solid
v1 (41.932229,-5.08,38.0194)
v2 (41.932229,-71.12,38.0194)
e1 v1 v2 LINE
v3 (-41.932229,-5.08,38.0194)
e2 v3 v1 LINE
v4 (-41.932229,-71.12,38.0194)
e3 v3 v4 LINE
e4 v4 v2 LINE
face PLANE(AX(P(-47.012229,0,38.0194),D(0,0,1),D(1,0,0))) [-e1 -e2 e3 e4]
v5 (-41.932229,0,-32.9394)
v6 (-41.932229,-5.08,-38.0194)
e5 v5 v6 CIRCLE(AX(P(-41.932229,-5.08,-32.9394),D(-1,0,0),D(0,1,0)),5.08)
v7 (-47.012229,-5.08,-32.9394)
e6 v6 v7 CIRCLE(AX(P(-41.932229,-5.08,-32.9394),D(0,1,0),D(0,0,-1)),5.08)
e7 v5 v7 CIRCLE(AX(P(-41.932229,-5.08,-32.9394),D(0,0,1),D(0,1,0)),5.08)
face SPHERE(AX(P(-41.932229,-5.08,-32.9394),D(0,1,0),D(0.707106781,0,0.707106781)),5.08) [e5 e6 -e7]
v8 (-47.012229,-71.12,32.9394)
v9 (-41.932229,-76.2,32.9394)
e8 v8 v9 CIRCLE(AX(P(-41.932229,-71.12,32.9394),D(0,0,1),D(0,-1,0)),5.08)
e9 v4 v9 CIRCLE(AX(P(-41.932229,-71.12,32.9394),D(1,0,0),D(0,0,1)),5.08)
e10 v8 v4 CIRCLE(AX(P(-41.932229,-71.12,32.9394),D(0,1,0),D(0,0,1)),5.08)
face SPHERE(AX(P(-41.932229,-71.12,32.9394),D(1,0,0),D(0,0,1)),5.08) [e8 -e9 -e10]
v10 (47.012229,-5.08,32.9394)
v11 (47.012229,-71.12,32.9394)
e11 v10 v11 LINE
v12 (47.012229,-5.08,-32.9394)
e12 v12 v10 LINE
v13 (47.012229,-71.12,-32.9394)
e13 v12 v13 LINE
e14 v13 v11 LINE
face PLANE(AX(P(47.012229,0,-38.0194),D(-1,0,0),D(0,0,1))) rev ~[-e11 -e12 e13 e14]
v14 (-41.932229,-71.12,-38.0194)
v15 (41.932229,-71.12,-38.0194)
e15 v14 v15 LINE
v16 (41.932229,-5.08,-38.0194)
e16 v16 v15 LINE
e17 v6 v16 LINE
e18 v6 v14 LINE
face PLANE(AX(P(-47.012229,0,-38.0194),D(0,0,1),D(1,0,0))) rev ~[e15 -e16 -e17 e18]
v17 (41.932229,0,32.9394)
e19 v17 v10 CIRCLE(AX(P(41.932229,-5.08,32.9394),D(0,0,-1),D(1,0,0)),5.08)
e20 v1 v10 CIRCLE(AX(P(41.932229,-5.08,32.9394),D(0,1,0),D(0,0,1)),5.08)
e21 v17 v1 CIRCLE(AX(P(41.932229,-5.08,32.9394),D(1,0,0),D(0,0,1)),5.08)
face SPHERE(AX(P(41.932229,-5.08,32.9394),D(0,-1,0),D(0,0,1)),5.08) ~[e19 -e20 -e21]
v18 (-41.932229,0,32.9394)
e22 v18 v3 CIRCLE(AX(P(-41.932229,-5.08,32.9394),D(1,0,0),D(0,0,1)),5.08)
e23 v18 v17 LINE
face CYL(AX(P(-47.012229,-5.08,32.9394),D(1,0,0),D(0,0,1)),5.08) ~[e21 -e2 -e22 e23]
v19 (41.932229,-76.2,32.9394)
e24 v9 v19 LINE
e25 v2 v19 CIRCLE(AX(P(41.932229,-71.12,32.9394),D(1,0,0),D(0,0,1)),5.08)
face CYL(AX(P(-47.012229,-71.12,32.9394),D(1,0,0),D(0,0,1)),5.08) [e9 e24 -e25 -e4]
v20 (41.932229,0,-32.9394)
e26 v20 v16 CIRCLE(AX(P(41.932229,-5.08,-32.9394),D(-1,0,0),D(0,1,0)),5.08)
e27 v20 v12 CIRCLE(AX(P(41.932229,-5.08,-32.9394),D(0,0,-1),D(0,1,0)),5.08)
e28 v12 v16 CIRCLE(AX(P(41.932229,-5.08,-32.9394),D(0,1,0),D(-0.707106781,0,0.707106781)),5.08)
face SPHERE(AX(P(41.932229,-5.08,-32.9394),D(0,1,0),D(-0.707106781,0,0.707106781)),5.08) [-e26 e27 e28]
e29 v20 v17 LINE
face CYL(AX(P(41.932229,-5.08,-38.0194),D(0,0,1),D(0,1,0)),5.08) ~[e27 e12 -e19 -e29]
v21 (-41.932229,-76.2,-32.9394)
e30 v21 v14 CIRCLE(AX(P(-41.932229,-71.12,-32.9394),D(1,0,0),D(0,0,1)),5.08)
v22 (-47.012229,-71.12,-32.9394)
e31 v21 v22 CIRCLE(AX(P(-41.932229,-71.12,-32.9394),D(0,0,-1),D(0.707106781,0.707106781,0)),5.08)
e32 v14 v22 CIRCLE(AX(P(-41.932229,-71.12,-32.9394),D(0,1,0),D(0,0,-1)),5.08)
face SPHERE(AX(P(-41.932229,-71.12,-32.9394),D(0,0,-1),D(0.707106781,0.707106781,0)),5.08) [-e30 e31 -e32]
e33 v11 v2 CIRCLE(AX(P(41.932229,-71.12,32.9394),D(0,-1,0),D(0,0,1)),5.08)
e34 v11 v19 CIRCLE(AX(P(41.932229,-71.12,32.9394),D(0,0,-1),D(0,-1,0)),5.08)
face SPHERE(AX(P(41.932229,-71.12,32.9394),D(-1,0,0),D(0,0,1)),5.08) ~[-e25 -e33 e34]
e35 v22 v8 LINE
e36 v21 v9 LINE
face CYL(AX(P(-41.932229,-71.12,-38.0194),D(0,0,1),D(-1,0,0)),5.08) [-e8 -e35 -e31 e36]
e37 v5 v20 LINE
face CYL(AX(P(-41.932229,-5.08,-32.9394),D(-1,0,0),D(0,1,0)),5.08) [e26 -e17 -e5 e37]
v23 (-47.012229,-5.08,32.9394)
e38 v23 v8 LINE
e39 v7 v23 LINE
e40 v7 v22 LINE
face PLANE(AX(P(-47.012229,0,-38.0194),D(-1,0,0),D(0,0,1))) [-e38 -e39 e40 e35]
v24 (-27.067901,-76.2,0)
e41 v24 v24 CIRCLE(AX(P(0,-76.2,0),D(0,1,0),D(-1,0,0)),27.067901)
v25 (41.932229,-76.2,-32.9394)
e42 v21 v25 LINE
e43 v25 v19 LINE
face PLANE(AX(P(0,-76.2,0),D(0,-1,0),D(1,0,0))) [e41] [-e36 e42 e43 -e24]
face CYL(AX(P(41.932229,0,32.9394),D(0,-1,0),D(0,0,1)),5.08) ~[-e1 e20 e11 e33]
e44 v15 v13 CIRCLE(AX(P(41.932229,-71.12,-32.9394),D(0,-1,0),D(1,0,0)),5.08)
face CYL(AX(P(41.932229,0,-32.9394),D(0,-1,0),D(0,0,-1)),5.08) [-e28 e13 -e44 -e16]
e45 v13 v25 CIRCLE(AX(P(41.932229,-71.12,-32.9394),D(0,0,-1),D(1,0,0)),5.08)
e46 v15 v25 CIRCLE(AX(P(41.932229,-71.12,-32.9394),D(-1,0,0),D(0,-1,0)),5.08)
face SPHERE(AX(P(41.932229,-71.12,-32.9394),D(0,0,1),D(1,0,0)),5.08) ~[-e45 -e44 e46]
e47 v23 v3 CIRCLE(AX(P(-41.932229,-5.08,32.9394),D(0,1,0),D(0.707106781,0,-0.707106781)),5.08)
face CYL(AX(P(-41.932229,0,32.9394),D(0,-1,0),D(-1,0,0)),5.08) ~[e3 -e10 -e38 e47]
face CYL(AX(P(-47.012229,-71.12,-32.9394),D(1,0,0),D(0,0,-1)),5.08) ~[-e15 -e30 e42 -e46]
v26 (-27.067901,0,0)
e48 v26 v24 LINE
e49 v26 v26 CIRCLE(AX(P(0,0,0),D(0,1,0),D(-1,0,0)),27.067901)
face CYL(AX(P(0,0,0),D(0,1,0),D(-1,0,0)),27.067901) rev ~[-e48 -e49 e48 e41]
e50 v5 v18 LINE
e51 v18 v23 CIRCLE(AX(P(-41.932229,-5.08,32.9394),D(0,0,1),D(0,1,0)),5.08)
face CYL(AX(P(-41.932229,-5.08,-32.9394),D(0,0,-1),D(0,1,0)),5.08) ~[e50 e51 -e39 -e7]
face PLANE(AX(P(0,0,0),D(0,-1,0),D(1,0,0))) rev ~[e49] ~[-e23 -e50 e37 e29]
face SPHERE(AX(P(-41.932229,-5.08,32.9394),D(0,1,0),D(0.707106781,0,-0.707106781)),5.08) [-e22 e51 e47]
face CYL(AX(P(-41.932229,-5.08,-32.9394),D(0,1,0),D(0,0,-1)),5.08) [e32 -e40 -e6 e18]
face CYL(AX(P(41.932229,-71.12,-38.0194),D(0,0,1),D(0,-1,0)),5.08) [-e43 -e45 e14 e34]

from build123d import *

# Parameters (mm, degrees)
F0_W         = 94.0244570374
F0_H         = 76.03880018
F1_DEPTH     = 76.2
F2_R         = 27.0679011962
F3_DEPTH     = 101.6
F4_R         = 5.08
F5_T1_DEPTH  = 83.8644570374
F5_T3_DEPTH  = 65.87880018
F5_T5_DEPTH  = 66.04
F5_S9_W      = 5.08
F5_S9_H      = 5.08
F5_T10_DEPTH = 5.08
F5_S15_W     = 5.08
F5_S15_H     = 5.08
F5_T16_DEPTH = 5.08
F5_S21_W     = 5.08
F5_S21_H     = 5.08
F5_T22_DEPTH = 5.08
F5_S27_W     = 5.08
F5_S27_H     = 5.08
F5_T28_DEPTH = 5.08


# Not quite as in the source:
# - a fillet or chamfer that OpenCascade refuses, or shapes differently, is made with other operations: its cross-section is extruded or revolved along the edge and cut away or added


with BuildPart() as f1:
    # F0 (on Front) → F1 (new body)
    with BuildSketch(Plane.XZ):
        Rectangle(F0_W, F0_H)
    extrude(amount=F1_DEPTH)

    # F2 (on face) → F3 (cut)
    with BuildSketch(Plane(origin=(0, 0, 0), x_dir=(-1, 0, 0), z_dir=(0, 1, 0))):
        Circle(F2_R)
    extrude(amount=-F3_DEPTH, mode=Mode.SUBTRACT)

    # F4
    f4_edges = [f1.edges().sort_by_distance(p)[0] for p in [
        (0, -76.2, 38.0194),
        (47.012229, -38.1, 38.0194),
        (0, 0, 38.0194),
        (-47.012229, -38.1, 38.0194),
        (47.012229, -76.2, 0),
        (47.012229, 0, 0),
        (47.012229, -38.1, -38.0194),
        (0, -76.2, -38.0194),
        (-47.012229, -76.2, 0),
    ]]
    fillet(f4_edges, radius=F4_R)

    # F5: fillet of radius 5.08 on 3 edges, made by hand

    # F5_s2 → F5_t1 (cut)
    with BuildSketch(Plane.YZ.offset(-41.9322285187)):
        with BuildLine():
            ThreePointArc((0, -32.93940009), (-1.4878975516, -36.5315025384), (-5.08, -38.01940009))
            Line((-5.08, -38.01940009), (0, -38.01940009))
            Line((0, -38.01940009), (0, -32.93940009))
        make_face()
    extrude(amount=F5_T1_DEPTH, mode=Mode.SUBTRACT)

    # F5_s4 → F5_t3 (cut)
    with BuildSketch(Plane.XY.offset(-32.93940009)):
        with BuildLine():
            ThreePointArc((-41.9322285187, 0), (-45.5243309672, -1.4878975516), (-47.0122285187, -5.08))
            Line((-47.0122285187, -5.08), (-47.0122285187, 0))
            Line((-47.0122285187, 0), (-41.9322285187, 0))
        make_face()
    extrude(amount=F5_T3_DEPTH, mode=Mode.SUBTRACT)

    # F5_s6 → F5_t5 (cut)
    with BuildSketch(Plane.XZ.offset(5.08)):
        with BuildLine():
            ThreePointArc((-41.9322285187, -38.01940009), (-45.5243309672, -36.5315025384), (-47.0122285187, -32.93940009))
            Line((-47.0122285187, -32.93940009), (-47.0122285187, -38.01940009))
            Line((-47.0122285187, -38.01940009), (-41.9322285187, -38.01940009))
        make_face()
    extrude(amount=F5_T5_DEPTH, mode=Mode.SUBTRACT)


with BuildPart() as f5_tool8:
    # F5_s9 → F5_t10 (new body)
    with BuildSketch(Plane.XY.offset(-32.93940009)):
        with Locations((-44.4722285187, -73.66)):
            Rectangle(F5_S9_W, F5_S9_H)
    extrude(amount=-F5_T10_DEPTH)

    # F5_s11 → F5_t12 (revolve, cut)
    with BuildSketch(Plane(origin=(-41.9322285187, -71.12, -32.93940009), x_dir=(0.7071067812, 0.7071067812, 0), z_dir=(-0.7071067812, 0.7071067812, 0))):
        with BuildLine():
            ThreePointArc((0, -5.08), (5.08, 0), (0, 5.08))
            Line((0, 5.08), (0, -5.08))
        make_face()
    revolve(axis=Axis((-41.9322285187, -71.12, -32.93940009), (0, 0, -1)), mode=Mode.SUBTRACT)


with BuildPart() as f1_1:
    add(f1.part)

    # F5_t7: cut F5_tool8
    add(f5_tool8.part, mode=Mode.SUBTRACT)


with BuildPart() as f5_tool14:
    # F5_s15 → F5_t16 (new body)
    with BuildSketch(Plane.XZ.offset(5.08)):
        with Locations((-44.4722285187, 35.47940009)):
            Rectangle(F5_S15_W, F5_S15_H)
    extrude(amount=-F5_T16_DEPTH)

    # F5_s17 → F5_t18 (revolve, cut)
    with BuildSketch(Plane(origin=(-41.9322285187, -5.08, 32.93940009), x_dir=(0.7071067812, 0, -0.7071067812), z_dir=(0.7071067812, 0, 0.7071067812))):
        with BuildLine():
            ThreePointArc((0, -5.08), (5.08, 0), (0, 5.08))
            Line((0, 5.08), (0, -5.08))
        make_face()
    revolve(axis=Axis((-41.9322285187, -5.08, 32.93940009), (0, 1, 0)), mode=Mode.SUBTRACT)


with BuildPart() as f1_2:
    add(f1_1.part)

    # F5_t13: cut F5_tool14
    add(f5_tool14.part, mode=Mode.SUBTRACT)


with BuildPart() as f5_tool20:
    # F5_s21 → F5_t22 (new body)
    with BuildSketch(Plane.XZ.offset(5.08)):
        with Locations((44.4722285187, -35.47940009)):
            Rectangle(F5_S21_W, F5_S21_H)
    extrude(amount=-F5_T22_DEPTH)

    # F5_s23 → F5_t24 (revolve, cut)
    with BuildSketch(Plane(origin=(41.9322285187, -5.08, -32.93940009), x_dir=(-0.7071067812, 0, 0.7071067812), z_dir=(-0.7071067812, 0, -0.7071067812))):
        with BuildLine():
            ThreePointArc((0, -5.08), (5.08, 0), (0, 5.08))
            Line((0, 5.08), (0, -5.08))
        make_face()
    revolve(axis=Axis((41.9322285187, -5.08, -32.93940009), (0, 1, 0)), mode=Mode.SUBTRACT)


with BuildPart() as f1_3:
    add(f1_2.part)

    # F5_t19: cut F5_tool20
    add(f5_tool20.part, mode=Mode.SUBTRACT)


with BuildPart() as f5_tool26:
    # F5_s27 → F5_t28 (new body)
    with BuildSketch(Plane.XZ.offset(5.08)):
        with Locations((-44.4722285187, -35.47940009)):
            Rectangle(F5_S27_W, F5_S27_H)
    extrude(amount=-F5_T28_DEPTH)

    # F5_s29 → F5_t30 (revolve, cut)
    with BuildSketch(Plane(origin=(-41.9322285187, -5.08, -32.93940009), x_dir=(0.7071067812, 0, 0.7071067812), z_dir=(-0.7071067812, 0, 0.7071067812))):
        with BuildLine():
            ThreePointArc((0, -5.08), (5.08, 0), (0, 5.08))
            Line((0, 5.08), (0, -5.08))
        make_face()
    revolve(axis=Axis((-41.9322285187, -5.08, -32.93940009), (0, 1, 0)), mode=Mode.SUBTRACT)


with BuildPart() as f1_4:
    add(f1_3.part)

    # F5_t25: cut F5_tool26
    add(f5_tool26.part, mode=Mode.SUBTRACT)


solid = f1_4.part
